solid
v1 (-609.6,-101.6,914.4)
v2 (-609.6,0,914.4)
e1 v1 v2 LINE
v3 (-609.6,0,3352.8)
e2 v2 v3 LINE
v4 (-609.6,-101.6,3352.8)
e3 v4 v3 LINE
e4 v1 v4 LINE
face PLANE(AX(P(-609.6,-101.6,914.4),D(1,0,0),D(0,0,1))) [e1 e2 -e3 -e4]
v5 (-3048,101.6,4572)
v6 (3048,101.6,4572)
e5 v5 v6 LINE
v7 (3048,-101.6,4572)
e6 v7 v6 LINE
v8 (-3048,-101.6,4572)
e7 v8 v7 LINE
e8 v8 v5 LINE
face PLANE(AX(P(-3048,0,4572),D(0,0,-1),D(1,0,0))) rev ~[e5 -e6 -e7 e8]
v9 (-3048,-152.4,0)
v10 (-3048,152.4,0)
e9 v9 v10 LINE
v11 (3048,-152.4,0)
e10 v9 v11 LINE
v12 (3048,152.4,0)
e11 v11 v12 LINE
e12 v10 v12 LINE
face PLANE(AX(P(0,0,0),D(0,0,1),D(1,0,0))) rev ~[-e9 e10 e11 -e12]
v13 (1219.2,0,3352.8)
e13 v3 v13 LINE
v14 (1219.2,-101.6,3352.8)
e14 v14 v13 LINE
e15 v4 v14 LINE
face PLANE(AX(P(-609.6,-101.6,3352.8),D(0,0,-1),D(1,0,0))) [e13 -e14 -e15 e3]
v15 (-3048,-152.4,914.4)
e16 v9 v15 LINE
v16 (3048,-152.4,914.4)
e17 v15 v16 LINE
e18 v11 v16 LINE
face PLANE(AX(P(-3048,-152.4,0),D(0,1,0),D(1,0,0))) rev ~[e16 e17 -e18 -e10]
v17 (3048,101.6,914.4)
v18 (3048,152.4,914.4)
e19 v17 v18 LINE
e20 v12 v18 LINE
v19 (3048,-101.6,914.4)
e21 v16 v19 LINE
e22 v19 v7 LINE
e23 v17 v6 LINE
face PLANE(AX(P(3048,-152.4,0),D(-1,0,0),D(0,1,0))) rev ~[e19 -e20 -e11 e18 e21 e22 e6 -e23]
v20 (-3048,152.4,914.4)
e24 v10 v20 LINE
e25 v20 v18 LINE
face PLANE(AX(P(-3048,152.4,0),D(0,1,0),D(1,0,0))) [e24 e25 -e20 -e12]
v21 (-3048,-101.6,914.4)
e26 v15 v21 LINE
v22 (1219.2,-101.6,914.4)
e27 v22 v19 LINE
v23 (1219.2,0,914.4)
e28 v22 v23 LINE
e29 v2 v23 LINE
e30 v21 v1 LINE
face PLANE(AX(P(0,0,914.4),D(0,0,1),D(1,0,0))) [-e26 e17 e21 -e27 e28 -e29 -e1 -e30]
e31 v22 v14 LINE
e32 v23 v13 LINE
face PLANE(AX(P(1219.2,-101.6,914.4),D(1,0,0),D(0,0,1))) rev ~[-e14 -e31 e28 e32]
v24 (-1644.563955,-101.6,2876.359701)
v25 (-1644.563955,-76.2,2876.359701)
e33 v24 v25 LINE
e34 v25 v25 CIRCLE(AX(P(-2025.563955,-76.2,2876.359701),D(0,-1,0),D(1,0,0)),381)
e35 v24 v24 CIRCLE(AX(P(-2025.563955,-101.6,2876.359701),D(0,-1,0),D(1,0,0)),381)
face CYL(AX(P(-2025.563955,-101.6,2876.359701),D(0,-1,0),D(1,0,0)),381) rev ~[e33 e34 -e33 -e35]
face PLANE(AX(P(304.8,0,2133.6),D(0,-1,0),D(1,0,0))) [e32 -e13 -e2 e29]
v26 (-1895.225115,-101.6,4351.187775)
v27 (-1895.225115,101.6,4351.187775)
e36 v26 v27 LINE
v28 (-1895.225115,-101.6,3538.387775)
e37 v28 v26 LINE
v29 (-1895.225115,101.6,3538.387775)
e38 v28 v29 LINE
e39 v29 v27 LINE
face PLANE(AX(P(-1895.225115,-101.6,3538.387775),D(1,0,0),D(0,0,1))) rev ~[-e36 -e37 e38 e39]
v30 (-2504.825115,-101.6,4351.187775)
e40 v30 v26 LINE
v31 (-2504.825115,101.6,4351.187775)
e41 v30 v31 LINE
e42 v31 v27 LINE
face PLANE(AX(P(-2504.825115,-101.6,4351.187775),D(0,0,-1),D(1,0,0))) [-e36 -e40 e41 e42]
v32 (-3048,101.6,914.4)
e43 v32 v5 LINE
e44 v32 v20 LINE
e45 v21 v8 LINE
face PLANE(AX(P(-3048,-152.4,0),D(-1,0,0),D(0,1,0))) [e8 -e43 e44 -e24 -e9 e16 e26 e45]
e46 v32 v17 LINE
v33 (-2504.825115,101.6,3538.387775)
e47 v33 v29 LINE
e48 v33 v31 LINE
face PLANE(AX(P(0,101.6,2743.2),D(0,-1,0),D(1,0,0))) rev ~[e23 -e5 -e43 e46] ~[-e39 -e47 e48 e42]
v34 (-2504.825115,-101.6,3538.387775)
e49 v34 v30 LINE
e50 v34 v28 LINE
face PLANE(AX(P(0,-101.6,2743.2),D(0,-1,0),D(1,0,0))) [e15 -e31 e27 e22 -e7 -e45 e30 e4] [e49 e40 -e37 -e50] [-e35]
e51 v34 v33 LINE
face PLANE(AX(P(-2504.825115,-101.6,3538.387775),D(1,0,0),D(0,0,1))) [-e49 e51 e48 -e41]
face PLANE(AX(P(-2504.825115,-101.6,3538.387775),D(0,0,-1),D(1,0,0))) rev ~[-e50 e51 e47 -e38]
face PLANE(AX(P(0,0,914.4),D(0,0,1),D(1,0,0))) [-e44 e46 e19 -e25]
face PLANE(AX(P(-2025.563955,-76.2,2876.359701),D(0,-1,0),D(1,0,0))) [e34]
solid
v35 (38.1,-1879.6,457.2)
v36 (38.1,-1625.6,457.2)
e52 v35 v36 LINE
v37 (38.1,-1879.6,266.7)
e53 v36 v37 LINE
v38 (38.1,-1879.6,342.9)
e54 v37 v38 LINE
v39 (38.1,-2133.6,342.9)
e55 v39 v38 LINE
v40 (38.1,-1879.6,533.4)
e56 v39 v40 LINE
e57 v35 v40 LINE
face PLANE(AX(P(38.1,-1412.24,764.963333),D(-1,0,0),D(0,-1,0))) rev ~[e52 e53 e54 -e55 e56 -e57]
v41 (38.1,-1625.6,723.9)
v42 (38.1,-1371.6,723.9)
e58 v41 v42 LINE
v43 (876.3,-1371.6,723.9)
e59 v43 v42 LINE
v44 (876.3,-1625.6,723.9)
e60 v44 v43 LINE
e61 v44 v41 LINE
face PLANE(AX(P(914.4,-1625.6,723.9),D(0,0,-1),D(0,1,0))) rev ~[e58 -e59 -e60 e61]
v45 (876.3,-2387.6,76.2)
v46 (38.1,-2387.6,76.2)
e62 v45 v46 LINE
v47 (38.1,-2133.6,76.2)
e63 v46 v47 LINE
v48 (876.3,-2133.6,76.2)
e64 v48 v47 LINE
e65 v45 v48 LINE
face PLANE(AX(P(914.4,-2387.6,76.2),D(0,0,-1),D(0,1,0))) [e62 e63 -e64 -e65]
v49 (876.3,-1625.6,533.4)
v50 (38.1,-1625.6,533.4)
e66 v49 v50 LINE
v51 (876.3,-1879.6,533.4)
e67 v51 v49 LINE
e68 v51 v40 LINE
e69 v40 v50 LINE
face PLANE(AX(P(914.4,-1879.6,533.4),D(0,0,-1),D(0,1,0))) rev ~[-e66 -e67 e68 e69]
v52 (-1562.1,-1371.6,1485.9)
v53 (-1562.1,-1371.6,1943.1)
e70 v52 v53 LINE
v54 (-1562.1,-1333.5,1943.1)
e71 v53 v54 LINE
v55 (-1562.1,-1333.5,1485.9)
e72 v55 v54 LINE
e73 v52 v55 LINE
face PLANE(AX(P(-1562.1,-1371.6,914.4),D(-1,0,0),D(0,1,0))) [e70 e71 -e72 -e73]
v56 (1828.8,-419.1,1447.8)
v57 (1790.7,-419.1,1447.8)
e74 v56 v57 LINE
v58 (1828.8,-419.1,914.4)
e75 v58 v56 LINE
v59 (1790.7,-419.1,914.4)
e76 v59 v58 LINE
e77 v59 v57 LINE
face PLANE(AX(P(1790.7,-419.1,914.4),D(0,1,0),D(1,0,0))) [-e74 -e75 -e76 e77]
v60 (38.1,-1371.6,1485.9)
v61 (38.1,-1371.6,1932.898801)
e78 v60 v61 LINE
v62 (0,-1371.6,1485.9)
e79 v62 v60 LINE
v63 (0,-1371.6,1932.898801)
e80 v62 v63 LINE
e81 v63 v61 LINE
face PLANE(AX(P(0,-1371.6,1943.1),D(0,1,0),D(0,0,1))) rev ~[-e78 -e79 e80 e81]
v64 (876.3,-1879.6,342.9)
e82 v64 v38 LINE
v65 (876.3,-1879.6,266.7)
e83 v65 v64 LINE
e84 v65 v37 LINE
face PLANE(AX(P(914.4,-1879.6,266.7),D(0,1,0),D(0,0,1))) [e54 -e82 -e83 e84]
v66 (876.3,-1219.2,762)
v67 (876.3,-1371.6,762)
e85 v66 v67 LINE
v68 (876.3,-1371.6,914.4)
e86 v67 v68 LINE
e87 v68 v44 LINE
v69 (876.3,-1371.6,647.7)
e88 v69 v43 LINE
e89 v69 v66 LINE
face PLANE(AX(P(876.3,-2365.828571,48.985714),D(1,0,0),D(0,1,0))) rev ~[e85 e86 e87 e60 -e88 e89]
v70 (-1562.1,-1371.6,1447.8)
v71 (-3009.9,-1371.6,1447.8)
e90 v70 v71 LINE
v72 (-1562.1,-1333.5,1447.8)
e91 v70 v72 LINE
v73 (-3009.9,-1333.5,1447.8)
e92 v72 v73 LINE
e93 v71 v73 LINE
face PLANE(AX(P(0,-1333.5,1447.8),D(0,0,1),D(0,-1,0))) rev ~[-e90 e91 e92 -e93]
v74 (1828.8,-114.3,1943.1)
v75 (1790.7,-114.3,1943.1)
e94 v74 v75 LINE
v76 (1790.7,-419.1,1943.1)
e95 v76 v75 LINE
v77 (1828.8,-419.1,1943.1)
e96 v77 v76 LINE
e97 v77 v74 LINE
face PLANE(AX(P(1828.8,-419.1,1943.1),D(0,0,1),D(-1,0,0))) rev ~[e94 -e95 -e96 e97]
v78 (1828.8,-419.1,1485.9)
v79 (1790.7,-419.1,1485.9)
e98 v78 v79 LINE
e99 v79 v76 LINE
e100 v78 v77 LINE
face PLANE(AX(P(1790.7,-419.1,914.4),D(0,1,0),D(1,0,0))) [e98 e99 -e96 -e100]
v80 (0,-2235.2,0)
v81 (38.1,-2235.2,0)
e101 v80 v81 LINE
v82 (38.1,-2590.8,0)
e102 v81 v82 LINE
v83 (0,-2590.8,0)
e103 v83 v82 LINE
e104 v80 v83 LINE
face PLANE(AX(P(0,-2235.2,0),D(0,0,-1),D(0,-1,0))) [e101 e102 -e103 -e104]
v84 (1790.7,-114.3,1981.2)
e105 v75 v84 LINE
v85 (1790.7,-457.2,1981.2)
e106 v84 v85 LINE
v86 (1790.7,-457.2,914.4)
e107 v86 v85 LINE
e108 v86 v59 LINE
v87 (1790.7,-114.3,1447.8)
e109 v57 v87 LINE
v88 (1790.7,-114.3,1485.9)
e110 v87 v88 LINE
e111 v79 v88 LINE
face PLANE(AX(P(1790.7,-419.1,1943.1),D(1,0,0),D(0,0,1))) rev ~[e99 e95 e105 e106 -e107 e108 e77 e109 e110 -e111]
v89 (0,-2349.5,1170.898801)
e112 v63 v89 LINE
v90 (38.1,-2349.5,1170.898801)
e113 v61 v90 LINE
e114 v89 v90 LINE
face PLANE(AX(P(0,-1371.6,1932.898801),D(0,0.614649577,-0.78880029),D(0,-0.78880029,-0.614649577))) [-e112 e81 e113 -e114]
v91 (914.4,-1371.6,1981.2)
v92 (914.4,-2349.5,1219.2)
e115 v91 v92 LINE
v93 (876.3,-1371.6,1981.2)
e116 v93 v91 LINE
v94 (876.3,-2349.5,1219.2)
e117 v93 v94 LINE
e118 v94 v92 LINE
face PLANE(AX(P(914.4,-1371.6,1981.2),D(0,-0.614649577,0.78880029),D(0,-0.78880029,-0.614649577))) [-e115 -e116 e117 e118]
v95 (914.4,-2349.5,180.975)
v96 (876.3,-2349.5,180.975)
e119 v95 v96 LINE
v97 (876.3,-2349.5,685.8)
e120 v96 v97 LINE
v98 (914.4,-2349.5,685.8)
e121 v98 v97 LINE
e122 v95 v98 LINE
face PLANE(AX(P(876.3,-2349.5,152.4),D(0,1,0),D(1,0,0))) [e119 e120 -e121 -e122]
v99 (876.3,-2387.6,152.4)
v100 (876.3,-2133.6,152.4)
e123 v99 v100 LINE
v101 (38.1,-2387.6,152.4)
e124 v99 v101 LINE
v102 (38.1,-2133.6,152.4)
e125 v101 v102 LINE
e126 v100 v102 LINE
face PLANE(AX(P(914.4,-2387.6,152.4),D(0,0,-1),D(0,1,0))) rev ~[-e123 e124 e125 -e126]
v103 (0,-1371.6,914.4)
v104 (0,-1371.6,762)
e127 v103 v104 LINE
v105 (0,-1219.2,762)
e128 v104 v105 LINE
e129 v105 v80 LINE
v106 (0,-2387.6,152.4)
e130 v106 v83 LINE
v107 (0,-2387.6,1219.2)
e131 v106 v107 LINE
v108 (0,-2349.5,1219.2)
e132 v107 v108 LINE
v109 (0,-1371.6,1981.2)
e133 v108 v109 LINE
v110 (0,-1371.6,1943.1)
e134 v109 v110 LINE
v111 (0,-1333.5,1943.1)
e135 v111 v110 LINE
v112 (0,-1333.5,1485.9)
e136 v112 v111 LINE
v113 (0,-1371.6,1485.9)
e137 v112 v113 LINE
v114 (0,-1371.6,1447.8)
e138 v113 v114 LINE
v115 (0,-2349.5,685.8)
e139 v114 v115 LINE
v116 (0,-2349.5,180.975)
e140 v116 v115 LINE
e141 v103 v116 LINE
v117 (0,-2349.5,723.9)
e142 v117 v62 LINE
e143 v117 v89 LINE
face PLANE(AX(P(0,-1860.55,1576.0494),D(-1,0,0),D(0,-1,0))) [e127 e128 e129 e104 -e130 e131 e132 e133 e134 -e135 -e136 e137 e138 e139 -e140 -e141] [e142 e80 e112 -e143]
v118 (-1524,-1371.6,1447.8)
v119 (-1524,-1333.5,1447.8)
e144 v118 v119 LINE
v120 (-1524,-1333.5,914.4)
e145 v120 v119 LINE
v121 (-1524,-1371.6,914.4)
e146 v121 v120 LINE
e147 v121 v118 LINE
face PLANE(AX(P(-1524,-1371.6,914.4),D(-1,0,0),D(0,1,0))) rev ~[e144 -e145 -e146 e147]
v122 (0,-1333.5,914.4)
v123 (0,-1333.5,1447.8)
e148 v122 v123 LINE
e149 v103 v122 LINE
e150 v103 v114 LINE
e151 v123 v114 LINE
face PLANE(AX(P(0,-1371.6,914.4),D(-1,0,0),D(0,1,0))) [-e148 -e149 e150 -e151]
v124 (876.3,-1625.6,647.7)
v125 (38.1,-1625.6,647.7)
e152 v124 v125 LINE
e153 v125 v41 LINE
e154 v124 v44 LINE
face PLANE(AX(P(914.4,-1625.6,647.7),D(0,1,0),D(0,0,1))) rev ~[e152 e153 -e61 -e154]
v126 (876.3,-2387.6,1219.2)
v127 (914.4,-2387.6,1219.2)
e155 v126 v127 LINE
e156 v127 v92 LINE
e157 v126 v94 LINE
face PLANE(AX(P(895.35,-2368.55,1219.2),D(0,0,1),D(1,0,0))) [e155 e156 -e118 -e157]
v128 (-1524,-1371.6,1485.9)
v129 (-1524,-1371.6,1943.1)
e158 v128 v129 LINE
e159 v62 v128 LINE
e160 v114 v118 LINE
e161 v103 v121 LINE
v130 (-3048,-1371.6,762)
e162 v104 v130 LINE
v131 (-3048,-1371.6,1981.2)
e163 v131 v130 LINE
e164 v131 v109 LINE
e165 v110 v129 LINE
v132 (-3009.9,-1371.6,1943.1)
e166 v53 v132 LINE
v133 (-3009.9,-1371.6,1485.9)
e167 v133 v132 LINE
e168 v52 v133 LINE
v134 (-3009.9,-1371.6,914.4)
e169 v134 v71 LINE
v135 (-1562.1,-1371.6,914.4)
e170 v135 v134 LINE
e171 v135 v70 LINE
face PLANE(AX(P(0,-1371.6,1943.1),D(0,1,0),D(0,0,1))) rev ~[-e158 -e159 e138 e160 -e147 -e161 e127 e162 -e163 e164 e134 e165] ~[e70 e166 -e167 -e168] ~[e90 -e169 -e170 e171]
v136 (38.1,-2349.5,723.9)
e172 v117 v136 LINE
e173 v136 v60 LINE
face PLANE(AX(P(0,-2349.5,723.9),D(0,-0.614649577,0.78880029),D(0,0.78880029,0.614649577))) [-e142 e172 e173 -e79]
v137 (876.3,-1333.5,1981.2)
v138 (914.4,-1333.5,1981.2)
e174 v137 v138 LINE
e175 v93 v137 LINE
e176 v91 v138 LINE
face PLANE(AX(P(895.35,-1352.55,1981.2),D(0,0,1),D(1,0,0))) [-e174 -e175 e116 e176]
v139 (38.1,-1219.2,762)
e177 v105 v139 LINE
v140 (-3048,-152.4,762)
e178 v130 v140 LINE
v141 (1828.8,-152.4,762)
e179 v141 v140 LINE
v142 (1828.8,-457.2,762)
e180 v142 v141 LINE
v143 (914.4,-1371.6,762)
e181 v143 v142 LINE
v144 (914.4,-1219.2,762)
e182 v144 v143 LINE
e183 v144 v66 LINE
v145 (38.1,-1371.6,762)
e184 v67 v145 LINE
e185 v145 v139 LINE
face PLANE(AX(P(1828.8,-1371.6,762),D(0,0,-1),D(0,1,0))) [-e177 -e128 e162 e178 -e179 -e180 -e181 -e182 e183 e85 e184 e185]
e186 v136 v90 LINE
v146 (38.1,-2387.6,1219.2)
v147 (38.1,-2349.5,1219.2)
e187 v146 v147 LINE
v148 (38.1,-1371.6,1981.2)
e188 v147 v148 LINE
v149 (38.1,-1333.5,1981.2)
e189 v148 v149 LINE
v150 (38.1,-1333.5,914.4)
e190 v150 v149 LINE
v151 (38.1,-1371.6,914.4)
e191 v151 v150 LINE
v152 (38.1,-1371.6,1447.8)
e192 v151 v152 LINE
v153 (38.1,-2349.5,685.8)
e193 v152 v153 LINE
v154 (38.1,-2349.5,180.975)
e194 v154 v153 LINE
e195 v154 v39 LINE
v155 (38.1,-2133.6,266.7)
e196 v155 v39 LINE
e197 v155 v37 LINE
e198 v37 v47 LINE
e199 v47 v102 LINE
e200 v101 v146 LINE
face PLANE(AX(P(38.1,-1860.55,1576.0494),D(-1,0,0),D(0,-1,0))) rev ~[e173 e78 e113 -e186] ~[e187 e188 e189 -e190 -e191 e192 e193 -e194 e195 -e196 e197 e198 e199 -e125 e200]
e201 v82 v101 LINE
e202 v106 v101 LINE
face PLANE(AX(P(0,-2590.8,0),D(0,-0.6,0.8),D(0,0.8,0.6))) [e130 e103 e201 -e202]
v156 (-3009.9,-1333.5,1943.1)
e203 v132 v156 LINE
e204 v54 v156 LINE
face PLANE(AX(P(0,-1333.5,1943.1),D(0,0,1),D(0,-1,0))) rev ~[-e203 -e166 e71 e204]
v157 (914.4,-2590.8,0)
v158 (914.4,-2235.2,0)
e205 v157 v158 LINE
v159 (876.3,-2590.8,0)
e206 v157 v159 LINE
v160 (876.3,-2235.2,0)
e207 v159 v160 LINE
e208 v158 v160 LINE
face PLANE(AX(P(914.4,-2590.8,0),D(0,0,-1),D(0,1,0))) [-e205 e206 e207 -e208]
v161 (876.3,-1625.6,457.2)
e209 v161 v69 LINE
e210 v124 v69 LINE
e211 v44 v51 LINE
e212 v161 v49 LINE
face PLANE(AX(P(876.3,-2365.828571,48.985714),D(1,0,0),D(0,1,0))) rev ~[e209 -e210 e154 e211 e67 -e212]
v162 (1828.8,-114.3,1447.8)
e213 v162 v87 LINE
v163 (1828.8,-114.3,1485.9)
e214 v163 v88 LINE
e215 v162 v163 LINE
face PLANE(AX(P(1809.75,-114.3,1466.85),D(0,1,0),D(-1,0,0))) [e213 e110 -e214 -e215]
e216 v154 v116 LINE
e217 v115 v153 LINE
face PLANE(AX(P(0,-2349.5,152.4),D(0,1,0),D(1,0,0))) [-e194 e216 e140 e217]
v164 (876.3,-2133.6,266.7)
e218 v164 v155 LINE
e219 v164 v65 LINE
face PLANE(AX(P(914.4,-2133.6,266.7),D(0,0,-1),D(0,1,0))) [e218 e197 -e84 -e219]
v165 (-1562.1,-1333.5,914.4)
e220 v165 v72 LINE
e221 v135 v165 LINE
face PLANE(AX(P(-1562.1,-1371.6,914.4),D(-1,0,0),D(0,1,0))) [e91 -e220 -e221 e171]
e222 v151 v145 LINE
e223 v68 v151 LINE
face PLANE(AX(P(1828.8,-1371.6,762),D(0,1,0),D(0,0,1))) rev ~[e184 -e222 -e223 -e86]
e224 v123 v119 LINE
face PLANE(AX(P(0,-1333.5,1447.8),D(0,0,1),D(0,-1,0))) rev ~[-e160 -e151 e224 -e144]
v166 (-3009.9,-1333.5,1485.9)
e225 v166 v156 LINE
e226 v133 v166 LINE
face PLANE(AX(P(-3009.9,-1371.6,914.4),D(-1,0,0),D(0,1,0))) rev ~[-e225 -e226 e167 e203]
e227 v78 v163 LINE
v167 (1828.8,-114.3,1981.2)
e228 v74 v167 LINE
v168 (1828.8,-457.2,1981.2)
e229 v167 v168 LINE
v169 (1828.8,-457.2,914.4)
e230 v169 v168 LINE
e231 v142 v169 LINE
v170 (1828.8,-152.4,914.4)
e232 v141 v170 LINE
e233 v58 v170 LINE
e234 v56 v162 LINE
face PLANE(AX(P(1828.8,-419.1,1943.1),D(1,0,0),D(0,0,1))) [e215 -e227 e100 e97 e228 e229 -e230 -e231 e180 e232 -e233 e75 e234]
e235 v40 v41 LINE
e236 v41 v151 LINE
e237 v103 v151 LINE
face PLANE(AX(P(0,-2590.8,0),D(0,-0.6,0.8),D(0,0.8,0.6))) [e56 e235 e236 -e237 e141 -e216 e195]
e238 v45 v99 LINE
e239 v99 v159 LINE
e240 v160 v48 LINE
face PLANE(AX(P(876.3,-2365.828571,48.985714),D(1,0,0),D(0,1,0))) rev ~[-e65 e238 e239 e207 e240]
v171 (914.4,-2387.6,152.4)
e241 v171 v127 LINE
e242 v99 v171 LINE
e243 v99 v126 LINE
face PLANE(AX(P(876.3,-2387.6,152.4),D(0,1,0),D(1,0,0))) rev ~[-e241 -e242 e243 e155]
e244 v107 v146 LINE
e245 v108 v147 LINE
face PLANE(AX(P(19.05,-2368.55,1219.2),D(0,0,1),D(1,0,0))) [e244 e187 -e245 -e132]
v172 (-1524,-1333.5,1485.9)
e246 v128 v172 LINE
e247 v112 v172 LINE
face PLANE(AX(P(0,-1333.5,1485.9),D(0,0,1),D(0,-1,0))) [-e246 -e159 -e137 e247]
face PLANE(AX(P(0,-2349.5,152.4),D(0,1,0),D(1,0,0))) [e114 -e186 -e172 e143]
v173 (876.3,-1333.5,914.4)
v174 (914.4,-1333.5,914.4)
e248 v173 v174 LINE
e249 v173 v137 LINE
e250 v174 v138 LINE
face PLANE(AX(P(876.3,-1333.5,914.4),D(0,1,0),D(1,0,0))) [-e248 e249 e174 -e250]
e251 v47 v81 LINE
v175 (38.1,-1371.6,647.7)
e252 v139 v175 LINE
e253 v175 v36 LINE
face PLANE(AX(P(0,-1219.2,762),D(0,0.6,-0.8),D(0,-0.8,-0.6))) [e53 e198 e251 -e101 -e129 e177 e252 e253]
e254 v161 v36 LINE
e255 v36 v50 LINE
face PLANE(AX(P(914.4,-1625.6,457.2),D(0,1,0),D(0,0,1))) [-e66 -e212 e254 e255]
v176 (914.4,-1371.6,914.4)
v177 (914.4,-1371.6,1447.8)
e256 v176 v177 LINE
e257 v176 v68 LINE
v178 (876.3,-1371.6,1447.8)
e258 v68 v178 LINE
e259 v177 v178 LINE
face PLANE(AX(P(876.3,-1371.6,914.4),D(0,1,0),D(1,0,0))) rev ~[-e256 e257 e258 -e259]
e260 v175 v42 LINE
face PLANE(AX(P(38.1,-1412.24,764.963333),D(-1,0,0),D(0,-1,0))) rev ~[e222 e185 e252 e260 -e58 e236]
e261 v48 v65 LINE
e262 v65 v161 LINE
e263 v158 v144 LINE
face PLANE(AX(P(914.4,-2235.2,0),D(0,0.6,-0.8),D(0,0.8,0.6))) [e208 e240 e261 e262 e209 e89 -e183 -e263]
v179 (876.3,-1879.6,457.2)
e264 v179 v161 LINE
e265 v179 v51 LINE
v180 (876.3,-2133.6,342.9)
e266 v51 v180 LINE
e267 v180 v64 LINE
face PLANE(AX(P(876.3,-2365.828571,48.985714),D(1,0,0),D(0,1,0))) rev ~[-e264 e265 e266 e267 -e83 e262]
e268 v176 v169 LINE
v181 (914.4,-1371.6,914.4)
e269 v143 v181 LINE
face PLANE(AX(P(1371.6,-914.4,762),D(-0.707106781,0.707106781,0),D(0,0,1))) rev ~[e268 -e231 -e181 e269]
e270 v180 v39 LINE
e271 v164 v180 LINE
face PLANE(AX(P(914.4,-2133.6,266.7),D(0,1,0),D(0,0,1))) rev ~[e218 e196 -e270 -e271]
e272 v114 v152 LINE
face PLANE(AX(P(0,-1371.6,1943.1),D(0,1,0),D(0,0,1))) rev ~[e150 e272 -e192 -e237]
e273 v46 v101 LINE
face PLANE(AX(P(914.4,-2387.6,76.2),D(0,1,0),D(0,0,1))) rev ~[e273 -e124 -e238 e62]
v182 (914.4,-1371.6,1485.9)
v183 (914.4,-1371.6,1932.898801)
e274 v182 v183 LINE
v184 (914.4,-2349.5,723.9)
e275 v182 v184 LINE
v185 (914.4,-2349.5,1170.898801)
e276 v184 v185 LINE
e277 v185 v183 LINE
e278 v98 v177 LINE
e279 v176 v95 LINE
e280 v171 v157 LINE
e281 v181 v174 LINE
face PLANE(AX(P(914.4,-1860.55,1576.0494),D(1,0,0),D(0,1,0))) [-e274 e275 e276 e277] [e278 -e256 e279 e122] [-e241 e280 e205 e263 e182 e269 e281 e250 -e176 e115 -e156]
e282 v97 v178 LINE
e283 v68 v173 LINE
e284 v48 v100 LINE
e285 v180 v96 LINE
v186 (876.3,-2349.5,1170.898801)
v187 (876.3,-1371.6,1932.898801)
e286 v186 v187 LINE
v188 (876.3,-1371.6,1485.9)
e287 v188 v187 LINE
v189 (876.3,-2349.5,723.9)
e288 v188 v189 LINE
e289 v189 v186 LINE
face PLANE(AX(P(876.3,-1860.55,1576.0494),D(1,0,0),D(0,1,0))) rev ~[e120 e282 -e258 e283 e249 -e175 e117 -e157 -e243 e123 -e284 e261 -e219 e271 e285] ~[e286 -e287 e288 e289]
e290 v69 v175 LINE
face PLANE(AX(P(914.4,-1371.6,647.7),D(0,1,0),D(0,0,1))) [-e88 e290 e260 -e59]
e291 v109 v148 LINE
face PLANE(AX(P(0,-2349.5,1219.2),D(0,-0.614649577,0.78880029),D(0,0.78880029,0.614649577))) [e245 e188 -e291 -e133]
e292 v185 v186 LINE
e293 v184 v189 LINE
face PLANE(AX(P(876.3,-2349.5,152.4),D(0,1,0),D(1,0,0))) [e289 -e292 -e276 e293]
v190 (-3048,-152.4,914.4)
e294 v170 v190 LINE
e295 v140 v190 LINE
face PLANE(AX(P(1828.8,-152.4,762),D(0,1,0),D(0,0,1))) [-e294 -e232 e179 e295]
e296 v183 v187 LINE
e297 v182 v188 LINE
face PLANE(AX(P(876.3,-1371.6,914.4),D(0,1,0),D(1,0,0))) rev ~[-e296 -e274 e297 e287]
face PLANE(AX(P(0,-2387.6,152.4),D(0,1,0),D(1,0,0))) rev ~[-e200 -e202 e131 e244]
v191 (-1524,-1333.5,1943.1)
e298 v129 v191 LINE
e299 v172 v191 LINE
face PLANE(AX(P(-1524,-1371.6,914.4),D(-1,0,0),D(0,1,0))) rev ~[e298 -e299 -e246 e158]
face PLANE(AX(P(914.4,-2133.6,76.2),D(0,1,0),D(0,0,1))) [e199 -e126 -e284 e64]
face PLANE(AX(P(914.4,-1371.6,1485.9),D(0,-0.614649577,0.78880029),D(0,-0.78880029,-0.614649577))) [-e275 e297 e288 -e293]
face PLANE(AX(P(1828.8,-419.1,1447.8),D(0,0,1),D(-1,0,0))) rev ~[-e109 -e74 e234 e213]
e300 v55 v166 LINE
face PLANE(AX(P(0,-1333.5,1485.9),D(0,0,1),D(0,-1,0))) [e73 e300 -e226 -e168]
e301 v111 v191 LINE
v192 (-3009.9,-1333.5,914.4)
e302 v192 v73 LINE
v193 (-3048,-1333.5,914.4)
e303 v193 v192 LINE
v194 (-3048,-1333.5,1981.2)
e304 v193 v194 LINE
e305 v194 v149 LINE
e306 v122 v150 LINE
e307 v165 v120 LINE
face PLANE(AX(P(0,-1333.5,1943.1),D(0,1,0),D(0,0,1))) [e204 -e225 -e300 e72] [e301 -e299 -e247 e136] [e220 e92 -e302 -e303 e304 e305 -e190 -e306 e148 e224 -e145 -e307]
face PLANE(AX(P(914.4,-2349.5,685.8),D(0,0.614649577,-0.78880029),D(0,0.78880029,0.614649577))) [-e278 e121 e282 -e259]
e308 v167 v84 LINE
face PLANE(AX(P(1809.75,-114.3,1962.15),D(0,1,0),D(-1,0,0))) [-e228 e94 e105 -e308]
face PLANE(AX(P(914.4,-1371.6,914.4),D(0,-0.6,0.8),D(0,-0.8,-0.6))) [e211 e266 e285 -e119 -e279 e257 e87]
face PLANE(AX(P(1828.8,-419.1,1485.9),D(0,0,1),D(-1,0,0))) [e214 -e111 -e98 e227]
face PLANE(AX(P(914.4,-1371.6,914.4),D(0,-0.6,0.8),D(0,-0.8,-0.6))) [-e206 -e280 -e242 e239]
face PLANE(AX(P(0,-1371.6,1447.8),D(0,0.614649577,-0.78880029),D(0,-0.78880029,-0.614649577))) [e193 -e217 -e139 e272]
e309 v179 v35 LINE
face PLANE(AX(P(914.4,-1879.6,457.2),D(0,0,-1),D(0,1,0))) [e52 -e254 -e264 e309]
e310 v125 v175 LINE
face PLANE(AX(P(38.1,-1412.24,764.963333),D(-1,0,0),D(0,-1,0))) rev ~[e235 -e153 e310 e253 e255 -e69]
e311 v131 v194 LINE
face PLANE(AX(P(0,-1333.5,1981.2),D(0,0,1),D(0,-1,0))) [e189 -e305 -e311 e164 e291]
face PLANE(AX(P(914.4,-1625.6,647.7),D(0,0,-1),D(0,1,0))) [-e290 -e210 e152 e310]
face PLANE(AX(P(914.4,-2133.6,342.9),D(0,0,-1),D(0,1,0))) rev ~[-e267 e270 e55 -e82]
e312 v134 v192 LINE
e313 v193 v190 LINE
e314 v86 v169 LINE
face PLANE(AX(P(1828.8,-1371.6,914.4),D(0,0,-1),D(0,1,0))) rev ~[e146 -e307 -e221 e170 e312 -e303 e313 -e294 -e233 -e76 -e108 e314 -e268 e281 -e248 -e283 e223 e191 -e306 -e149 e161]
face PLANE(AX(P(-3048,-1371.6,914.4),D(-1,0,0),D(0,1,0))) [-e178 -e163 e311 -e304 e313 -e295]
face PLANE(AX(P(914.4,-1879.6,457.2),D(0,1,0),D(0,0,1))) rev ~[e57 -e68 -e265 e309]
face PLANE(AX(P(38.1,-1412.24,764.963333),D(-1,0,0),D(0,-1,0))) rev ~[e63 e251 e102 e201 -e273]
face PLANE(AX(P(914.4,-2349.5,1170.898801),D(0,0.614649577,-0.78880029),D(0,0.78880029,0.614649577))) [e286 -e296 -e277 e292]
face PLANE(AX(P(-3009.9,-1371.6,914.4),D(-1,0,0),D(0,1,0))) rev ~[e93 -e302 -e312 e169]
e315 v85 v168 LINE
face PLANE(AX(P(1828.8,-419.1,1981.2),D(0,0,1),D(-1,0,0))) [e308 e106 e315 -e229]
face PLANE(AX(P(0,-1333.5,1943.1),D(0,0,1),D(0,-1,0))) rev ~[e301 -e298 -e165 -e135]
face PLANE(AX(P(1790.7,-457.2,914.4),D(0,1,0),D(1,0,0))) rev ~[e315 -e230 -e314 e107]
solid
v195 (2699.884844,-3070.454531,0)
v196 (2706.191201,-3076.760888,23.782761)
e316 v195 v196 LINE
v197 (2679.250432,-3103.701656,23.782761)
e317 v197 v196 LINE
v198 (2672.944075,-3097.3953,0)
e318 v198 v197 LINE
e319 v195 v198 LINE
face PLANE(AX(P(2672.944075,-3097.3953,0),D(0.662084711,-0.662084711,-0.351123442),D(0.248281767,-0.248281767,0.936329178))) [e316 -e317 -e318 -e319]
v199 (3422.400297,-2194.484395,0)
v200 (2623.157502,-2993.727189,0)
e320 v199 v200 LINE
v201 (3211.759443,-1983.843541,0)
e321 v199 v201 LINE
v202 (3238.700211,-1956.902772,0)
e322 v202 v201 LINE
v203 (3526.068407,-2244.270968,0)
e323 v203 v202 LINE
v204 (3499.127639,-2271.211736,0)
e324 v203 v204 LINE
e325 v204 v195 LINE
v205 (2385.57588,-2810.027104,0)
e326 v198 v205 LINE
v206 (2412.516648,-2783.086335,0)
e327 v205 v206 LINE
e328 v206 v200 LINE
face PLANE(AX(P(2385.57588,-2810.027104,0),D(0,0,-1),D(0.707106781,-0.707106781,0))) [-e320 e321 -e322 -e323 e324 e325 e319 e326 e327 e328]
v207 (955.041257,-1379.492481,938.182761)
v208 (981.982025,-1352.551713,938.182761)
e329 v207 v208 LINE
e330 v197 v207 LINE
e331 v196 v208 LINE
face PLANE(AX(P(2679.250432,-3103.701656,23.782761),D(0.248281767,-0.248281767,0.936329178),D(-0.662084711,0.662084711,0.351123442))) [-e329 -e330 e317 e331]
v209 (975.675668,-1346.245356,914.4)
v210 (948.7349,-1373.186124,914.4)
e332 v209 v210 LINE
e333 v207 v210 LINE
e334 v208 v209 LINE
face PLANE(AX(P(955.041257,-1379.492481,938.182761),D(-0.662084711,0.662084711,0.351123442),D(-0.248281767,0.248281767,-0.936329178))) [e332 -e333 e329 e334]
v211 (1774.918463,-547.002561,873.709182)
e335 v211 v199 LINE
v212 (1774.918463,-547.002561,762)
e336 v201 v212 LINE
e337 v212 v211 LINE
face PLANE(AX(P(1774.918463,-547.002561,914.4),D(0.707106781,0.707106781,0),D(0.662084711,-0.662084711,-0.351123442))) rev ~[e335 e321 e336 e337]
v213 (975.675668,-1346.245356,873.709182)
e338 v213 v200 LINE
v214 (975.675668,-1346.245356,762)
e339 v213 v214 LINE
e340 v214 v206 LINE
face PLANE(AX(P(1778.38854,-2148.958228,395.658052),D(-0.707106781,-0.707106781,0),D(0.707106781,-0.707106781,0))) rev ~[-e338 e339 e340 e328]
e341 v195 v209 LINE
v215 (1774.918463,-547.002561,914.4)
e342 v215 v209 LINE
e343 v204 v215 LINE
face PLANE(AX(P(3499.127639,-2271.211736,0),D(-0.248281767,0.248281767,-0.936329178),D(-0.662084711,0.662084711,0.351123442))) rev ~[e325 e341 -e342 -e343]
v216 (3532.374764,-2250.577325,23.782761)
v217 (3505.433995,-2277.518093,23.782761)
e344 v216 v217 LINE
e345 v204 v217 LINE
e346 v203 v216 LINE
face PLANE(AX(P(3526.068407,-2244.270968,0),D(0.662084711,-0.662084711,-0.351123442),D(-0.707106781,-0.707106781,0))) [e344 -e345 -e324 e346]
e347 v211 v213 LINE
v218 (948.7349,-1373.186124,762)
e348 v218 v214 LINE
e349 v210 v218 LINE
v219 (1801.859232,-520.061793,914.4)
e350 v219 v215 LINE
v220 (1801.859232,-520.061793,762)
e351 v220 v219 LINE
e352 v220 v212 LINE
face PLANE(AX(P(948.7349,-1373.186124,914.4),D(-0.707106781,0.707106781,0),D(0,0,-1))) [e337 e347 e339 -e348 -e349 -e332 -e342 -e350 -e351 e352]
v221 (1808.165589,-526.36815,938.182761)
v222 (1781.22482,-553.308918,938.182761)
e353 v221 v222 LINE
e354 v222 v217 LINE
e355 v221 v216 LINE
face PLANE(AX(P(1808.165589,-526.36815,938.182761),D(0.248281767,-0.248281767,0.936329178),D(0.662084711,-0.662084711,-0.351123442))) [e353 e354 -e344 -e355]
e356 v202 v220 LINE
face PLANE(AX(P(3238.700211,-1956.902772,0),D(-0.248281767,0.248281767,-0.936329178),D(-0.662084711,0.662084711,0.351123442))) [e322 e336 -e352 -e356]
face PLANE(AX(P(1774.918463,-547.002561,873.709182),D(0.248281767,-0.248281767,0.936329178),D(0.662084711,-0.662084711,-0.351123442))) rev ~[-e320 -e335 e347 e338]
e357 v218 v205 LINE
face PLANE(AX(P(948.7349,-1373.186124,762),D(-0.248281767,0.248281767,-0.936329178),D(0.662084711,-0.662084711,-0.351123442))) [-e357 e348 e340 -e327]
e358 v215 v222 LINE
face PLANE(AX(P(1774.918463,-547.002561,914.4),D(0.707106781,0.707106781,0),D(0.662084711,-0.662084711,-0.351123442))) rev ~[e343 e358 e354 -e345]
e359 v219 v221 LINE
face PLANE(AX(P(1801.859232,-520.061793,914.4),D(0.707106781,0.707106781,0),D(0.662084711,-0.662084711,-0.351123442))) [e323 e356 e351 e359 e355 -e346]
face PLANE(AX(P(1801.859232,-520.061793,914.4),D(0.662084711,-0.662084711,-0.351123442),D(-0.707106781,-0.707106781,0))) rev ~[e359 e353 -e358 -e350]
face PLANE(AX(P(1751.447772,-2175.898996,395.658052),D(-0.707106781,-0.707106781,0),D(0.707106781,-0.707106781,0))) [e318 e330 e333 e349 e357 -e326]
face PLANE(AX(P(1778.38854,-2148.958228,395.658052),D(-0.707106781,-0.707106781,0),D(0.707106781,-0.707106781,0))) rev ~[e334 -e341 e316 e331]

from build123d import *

# Parameters (mm, degrees)
F0_W      = 6096
F0_H      = 304.8
F1_DEPTH  = 914.4
F2_W      = 6096
F2_H      = 3657.6
F3_DEPTH  = 101.6
F5_W      = 1219.2
F5_H      = 152.4
F6_DEPTH  = 4876.8
F7_W      = 1828.8
F7_H      = 2438.4
F8_DEPTH  = 101.6
F9_SIZE   = 914.4
F12_W     = 254
F12_H     = 76.2
F13_DEPTH = 38.1
F14_DEPTH = 914.4
F15_W     = 254
F15_H     = 76.2
F16_DEPTH = 38.1
F17_W     = 38.1
F17_H     = 38.1
F18_DEPTH = 1066.8
F19_W     = 38.1
F19_H     = 38.1
F20_DEPTH = 3048
F21_W     = 38.1
F21_H     = 38.1
F22_DEPTH = 304.8
F23_W     = 38.1
F23_H     = 38.1
F24_DEPTH = 1066.8
F26_DEPTH = 38.1
F28_DEPTH = 38.1
F32_DEPTH = 38.1
F34_DEPTH = 25.4
F35_DEPTH = 1168.4
F37_DEPTH = 38.1
F38_R     = 381
F39_DEPTH = 25.4
F40_W     = 609.6
F40_H     = 812.8
F41_DEPTH = 254.001


with BuildPart() as f1:
    # F0 (on Top) → F1 (new body)
    with BuildSketch(Plane.XY):
        Rectangle(F0_W, F0_H)
    extrude(amount=F1_DEPTH)

    # F2 (on Front) → F3 (join, symmetric)
    with BuildSketch(Plane.XZ):
        with Locations((0, 2743.2)):
            Rectangle(F2_W, F2_H)
    extrude(amount=F3_DEPTH, both=True)

    # F7 (on face) → F8 (cut)
    with BuildSketch(Plane.XZ.offset(101.6)):
        with Locations((304.8, 2133.6)):
            Rectangle(F7_W, F7_H)
    extrude(amount=-F8_DEPTH, mode=Mode.SUBTRACT)

    # F38 (on face) → F39 (cut)
    with BuildSketch(Plane.XZ.offset(101.6)):
        with Locations((-2025.563955307, 2876.3597011566)):
            Circle(F38_R)
    extrude(amount=-F39_DEPTH, mode=Mode.SUBTRACT)

    # F40 (on face) → F41 (cut, through all)
    with BuildSketch(Plane.XZ.offset(101.6)):
        with Locations((-2200.0251152039, 3944.7877754211)):
            Rectangle(F40_W, F40_H)
    extrude(amount=-F41_DEPTH, mode=Mode.SUBTRACT)


with BuildPart() as f6:
    # F5 (on offset) → F6 (new body)
    with BuildSketch(Plane.YZ.offset(1828.8)):
        with Locations((-762, 838.2)):
            Rectangle(F5_W, F5_H)
    extrude(amount=-F6_DEPTH)

    # F9
    f9_edges = [f6.edges().sort_by_distance(p)[0] for p in [
        (1828.8, -1371.6, 838.2),
    ]]
    chamfer(f9_edges, length=F9_SIZE)

    # F12 (on plane+point) → F13 (join)
    with BuildSketch(Plane.YZ.offset(914.4)):
        Polygon((-2235.2, 0), (-2133.6, 76.2), (-2387.6, 76.2), (-2387.6, 152.4), (-2590.8, 0), align=None)
        with Locations((-2260.6, 114.3)):
            Rectangle(F12_W, F12_H)
        Polygon((-2133.6, 76.2), (-1879.6, 266.7), (-2133.6, 266.7), (-2133.6, 342.9), (-2387.6, 152.4), (-2133.6, 152.4), align=None)
        with Locations((-2006.6, 304.8)):
            Rectangle(F12_W, F12_H)
        Polygon((-1879.6, 266.7), (-1625.6, 457.2), (-1879.6, 457.2), (-1879.6, 533.4), (-2133.6, 342.9), (-1879.6, 342.9), align=None)
        with Locations((-1752.6, 495.3)):
            Rectangle(F12_W, F12_H)
        Polygon((-1625.6, 457.2), (-1371.6, 647.7), (-1625.6, 647.7), (-1625.6, 723.9), (-1879.6, 533.4), (-1625.6, 533.4), align=None)
        with Locations((-1498.6, 685.8)):
            Rectangle(F12_W, F12_H)
        Polygon((-1371.6, 647.7), (-1219.2, 762), (-1371.6, 762), (-1371.6, 914.4), (-1625.6, 723.9), (-1371.6, 723.9), align=None)
    extrude(amount=-F13_DEPTH)

    # F12 (on plane+point) → F14 (join)
    with BuildSketch(Plane.YZ.offset(914.4)):
        with Locations((-2260.6, 114.3)):
            Rectangle(F12_W, F12_H)
        with Locations((-2006.6, 304.8)):
            Rectangle(F12_W, F12_H)
        with Locations((-1752.6, 495.3)):
            Rectangle(F12_W, F12_H)
        with Locations((-1498.6, 685.8)):
            Rectangle(F12_W, F12_H)
    extrude(amount=-F14_DEPTH)

    # F15 (on face) → F16 (join)
    with BuildSketch(Plane(origin=(0, 0, 0), x_dir=(0, -1, 0), z_dir=(-1, 0, 0))):
        Polygon((1371.6, 914.4), (1371.6, 762), (1219.2, 762), (1371.6, 647.7), (1371.6, 723.9), (1625.6, 723.9), align=None)
        with Locations((1498.6, 685.8)):
            Rectangle(F15_W, F15_H)
        Polygon((2590.8, 0), (1625.6, 723.9), (1625.6, 647.7), (1371.6, 647.7), (2235.2, 0), align=None)
    extrude(amount=-F16_DEPTH)

    # F17 (on face) → F18 (join)
    with BuildSketch(Plane.XY.offset(914.4)):
        with Locations((-3028.95, -1352.55)):
            Rectangle(F17_W, F17_H)
        with Locations((-1543.05, -1352.55)):
            Rectangle(F17_W, F17_H)
        with Locations((19.05, -1352.55)):
            Rectangle(F17_W, F17_H)
        with Locations((895.35, -1352.55)):
            Rectangle(F17_W, F17_H)
        with Locations((1809.75, -438.15)):
            Rectangle(F17_W, F17_H)
    extrude(amount=F18_DEPTH)

    # F19 (on face) → F20 (join, through all)
    with BuildSketch(Plane(origin=(0, 0, 0), x_dir=(0, -1, 0), z_dir=(-1, 0, 0))):
        with Locations((1352.55, 1962.15)):
            Rectangle(F19_W, F19_H)
        with Locations((1352.55, 1466.85)):
            Rectangle(F19_W, F19_H)
    extrude(amount=F20_DEPTH)

    # F21 (on face) → F22 (join)
    with BuildSketch(Plane(origin=(0, -419.1, 0), x_dir=(-1, 0, 0), z_dir=(0, 1, 0))):
        with Locations((-1809.75, 1962.15)):
            Rectangle(F21_W, F21_H)
        with Locations((-1809.75, 1466.85)):
            Rectangle(F21_W, F21_H)
    extrude(amount=F22_DEPTH)

    # F23 (on face) → F24 (join)
    with BuildSketch(Plane.XY.offset(152.4)):
        with Locations((19.05, -2368.55)):
            Rectangle(F23_W, F23_H)
        with Locations((895.35, -2368.55)):
            Rectangle(F23_W, F23_H)
    extrude(amount=F24_DEPTH)

    # F25 (on face) → F26 (join)
    with BuildSketch(Plane(origin=(0, 0, 0), x_dir=(0, -1, 0), z_dir=(-1, 0, 0))):
        Polygon((2349.5, 1219.2), (1371.6, 1981.2), (1371.6, 1932.8988007302), (2349.5, 1170.8988007302), align=None)
        Polygon((2349.5, 723.9), (1371.6, 1485.9), (1371.6, 1447.8), (2349.5, 685.8), align=None)
    extrude(amount=-F26_DEPTH)

    # F27 (on face) → F28 (join)
    with BuildSketch(Plane.YZ.offset(914.4)):
        Polygon((-1371.6, 1981.2), (-2349.5, 1219.2), (-2349.5, 1170.8988007302), (-1371.6, 1932.8988007302), align=None)
        Polygon((-1371.6, 1485.9), (-2349.5, 723.9), (-2349.5, 685.8), (-1371.6, 1447.8), align=None)
    extrude(amount=-F28_DEPTH)


with BuildPart() as f32:
    # F31 (on face) → F32 (new body)
    with BuildSketch(Plane(origin=(640.8987193947, 640.8987193947, 0), x_dir=(-0.7071067812, 0.7071067812, 0), z_dir=(0.7071067812, 0.7071067812, 0))):
        Polygon((-1641.8461017924, 762), (-1641.8461017924, 914.4), (-4080.2461017924, 0), (-3673.8461017924, 0), align=None)
    extrude(amount=-F32_DEPTH)

    # F34 (add): a face of the model
    f34_faces = [f32.faces().sort_by_distance(p)[0] for p in [
        (2650.4934350778, -1395.6367646517, 457.2),
    ]]
    extrude(f34_faces, amount=F34_DEPTH)

    # F33 (on face) → F35 (join)
    with BuildSketch(Plane(origin=(613.9579510314, 613.9579510314, 0), x_dir=(0.7071067812, -0.7071067812, 0), z_dir=(-0.7071067812, -0.7071067812, 0))):
        Polygon((1641.8461017924, 914.4), (1641.8461017924, 873.7091821629), (3971.7372542269, 0), (4080.2461017924, 0), align=None)
    extrude(amount=F35_DEPTH)

    # F36 (on face) → F37 (join)
    with BuildSketch(Plane(origin=(-212.2256121069, -212.2256121069, 0), x_dir=(0.7071067812, -0.7071067812, 0), z_dir=(-0.7071067812, -0.7071067812, 0))):
        Polygon((3673.8461017924, 0), (3971.7372542269, 0), (1641.8461017924, 873.7091821629), (1641.8461017924, 762), align=None)
        Polygon((3971.7372542269, 0), (4080.2461017924, 0), (1641.8461017924, 914.4), (1641.8461017924, 873.7091821629), align=None)
        Polygon((4080.2461017924, 0), (4089.1646372088, 23.7827611103), (1650.7646372088, 938.1827611103), (1641.8461017924, 914.4), align=None)
    extrude(amount=-F37_DEPTH)


solid = Compound([f1.part, f6.part, f32.part])
